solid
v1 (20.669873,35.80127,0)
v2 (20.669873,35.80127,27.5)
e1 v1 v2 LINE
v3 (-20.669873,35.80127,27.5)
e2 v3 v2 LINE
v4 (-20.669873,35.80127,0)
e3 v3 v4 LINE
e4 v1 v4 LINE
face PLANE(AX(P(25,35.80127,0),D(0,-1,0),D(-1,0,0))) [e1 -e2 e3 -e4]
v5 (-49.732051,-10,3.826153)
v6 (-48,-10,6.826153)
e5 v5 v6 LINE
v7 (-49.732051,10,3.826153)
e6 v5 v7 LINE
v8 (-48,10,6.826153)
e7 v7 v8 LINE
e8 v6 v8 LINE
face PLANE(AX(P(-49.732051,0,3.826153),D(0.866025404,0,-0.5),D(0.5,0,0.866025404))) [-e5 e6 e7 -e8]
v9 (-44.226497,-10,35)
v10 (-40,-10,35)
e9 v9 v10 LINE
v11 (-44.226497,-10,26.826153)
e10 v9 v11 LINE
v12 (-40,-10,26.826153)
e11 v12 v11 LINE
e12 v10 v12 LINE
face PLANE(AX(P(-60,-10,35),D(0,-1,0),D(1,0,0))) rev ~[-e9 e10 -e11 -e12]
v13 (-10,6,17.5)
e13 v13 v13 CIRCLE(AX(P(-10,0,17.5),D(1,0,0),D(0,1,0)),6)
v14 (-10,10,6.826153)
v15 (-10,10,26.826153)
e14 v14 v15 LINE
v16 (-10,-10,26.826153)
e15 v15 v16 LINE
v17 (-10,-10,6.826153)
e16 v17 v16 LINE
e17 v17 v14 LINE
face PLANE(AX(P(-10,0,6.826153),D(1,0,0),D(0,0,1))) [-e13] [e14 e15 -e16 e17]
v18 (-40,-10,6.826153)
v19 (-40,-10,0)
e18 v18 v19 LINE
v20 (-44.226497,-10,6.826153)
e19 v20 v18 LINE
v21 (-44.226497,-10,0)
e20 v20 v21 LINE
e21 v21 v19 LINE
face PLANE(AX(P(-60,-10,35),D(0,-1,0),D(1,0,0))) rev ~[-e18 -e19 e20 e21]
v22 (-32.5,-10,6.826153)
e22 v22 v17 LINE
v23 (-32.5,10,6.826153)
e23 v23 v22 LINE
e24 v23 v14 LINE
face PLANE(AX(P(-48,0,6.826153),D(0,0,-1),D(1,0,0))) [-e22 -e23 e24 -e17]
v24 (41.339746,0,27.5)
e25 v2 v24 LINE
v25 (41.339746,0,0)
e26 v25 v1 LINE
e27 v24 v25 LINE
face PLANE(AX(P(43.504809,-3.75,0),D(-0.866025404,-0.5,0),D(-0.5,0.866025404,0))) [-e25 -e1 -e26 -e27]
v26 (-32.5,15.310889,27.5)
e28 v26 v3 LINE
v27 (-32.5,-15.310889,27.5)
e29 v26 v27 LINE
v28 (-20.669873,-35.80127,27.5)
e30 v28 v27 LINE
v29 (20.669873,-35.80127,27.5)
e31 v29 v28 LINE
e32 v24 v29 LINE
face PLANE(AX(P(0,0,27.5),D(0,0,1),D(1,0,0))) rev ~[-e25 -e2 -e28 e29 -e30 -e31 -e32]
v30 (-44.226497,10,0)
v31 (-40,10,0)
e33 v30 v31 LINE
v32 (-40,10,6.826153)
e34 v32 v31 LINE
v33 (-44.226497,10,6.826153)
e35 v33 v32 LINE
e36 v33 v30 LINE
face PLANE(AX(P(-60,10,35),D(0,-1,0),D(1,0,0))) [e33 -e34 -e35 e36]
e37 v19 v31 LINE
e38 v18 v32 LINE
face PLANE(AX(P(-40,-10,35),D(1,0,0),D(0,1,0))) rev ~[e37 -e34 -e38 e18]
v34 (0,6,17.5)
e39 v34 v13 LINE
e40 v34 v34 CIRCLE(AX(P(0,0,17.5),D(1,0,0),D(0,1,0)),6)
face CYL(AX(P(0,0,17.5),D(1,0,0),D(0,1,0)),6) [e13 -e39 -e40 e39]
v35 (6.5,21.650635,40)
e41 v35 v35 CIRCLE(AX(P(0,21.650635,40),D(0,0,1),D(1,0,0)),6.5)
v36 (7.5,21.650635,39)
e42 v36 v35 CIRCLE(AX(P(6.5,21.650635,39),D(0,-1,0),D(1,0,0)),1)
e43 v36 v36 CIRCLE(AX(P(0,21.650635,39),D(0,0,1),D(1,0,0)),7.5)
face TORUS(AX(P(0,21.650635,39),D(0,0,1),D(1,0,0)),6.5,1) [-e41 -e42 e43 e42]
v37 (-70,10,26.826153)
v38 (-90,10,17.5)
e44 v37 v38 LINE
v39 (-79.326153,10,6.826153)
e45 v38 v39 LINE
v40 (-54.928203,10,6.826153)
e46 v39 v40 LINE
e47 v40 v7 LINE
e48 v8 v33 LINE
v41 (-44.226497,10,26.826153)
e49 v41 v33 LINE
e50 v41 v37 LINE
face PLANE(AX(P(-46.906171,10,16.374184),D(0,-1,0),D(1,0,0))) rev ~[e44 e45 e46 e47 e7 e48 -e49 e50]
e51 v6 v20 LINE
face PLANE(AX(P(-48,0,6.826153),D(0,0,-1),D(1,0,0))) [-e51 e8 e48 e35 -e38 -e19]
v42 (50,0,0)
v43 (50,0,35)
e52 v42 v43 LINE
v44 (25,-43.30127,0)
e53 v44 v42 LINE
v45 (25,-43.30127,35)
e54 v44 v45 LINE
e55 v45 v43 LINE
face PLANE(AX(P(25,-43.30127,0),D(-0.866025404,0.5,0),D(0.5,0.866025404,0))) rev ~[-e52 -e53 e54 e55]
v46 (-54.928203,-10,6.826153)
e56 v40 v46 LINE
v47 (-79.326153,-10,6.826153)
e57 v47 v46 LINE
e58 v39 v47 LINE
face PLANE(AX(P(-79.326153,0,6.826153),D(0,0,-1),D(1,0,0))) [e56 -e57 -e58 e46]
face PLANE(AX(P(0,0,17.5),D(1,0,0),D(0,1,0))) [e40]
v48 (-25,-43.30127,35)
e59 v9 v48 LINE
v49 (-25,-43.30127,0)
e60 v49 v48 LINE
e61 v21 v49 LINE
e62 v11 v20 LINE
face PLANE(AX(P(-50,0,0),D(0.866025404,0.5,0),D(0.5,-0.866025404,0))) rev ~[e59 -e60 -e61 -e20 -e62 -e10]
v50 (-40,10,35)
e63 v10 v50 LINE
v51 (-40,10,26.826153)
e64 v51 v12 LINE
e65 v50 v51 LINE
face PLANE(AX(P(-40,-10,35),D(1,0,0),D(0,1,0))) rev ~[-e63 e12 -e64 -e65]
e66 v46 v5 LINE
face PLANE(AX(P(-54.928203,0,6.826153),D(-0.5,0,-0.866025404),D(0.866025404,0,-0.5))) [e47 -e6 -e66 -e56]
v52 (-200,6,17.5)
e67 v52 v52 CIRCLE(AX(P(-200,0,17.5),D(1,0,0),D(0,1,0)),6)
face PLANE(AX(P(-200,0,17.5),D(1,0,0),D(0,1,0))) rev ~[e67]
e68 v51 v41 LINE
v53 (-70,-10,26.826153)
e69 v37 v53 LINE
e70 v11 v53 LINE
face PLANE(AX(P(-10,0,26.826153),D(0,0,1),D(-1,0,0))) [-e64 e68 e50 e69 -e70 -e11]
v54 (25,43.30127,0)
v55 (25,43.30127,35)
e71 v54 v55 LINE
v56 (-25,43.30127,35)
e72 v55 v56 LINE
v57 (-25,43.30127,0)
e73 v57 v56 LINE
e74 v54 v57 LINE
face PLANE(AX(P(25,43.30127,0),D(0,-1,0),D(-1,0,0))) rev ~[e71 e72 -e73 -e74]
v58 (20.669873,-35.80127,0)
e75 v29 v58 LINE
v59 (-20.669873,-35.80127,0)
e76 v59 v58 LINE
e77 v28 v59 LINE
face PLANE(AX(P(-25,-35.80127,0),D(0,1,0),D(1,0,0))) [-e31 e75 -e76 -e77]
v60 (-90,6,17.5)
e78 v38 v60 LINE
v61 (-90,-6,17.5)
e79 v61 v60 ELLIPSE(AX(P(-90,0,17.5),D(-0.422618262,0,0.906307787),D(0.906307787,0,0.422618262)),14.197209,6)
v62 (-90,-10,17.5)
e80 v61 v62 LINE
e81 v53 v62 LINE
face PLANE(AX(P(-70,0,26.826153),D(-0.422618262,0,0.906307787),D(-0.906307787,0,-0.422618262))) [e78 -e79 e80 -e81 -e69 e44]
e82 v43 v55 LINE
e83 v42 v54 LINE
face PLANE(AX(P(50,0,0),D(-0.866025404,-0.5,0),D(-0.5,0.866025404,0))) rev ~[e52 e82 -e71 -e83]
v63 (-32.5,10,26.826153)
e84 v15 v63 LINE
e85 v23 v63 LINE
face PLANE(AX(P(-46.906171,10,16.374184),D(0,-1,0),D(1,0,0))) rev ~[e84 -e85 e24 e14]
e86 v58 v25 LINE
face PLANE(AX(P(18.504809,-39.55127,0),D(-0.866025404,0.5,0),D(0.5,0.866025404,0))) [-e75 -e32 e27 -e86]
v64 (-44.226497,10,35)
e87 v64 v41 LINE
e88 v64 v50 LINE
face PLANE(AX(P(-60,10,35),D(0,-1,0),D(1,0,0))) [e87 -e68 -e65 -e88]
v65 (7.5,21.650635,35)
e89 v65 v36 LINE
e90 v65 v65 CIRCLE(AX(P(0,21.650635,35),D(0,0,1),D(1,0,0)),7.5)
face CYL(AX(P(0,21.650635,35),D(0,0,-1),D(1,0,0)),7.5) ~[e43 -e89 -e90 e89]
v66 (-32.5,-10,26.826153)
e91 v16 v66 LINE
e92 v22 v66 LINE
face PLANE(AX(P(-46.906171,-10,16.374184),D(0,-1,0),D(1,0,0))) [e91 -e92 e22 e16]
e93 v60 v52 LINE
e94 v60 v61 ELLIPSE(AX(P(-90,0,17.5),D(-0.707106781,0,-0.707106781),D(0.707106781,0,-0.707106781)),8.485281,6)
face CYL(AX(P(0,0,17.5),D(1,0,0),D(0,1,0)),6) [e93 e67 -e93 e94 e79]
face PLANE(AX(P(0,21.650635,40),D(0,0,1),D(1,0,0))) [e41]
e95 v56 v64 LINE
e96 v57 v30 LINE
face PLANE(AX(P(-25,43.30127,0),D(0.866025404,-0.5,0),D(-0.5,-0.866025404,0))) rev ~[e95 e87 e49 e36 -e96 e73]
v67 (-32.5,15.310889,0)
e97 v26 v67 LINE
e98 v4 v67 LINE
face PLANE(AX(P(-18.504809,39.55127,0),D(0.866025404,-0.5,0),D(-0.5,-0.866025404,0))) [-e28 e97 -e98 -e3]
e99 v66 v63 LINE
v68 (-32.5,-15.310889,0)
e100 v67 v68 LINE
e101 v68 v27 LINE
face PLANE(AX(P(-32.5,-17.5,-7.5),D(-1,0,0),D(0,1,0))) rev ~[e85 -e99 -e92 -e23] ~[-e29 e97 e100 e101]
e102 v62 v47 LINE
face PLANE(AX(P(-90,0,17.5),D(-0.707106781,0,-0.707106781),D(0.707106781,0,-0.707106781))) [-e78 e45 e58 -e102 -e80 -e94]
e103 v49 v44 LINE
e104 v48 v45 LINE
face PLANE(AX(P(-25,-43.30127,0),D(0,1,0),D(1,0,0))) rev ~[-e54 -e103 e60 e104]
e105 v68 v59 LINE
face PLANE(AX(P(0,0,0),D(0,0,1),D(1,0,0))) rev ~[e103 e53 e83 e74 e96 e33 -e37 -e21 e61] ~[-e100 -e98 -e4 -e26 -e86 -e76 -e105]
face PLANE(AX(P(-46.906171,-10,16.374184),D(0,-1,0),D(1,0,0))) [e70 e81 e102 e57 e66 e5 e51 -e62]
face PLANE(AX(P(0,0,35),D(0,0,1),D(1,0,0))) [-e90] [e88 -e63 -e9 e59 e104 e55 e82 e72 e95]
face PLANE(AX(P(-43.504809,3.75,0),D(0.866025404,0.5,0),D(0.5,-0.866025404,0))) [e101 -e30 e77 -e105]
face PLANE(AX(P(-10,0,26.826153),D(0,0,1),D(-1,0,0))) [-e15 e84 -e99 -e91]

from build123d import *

# Parameters (mm, degrees)
F1_DEPTH    = 35
F2_R        = 7.5
F3_DEPTH    = 5
F4_R        = 1
F5_W        = 20
F5_H        = 20
F6_DEPTH    = 35.001
F7_T        = 7.5
F7_T3_DEPTH = 50
F10_DEPTH   = 10
F9_R        = 6
F11_DEPTH   = 200


# Not quite as in the source:
# - a shell that OpenCascade refuses in one call is made with other operations: the cavity is built on its own and cut out


with BuildPart() as f1:
    # F0 (on Top) → F1 (new body)
    with BuildSketch(Plane.XY):
        Polygon((25, 43.3012701892), (-25, 43.3012701892), (-50, 0), (-25, -43.3012701892), (25, -43.3012701892), (50, 0), align=None)
    extrude(amount=F1_DEPTH)

    # F2 (on face) → F3 (join)
    with BuildSketch(Plane.XY.offset(35)):
        with Locations((0, 21.6506350946)):
            Circle(F2_R)
    extrude(amount=F3_DEPTH)

    # F4
    f4_edges = [f1.edges().sort_by_distance(p)[0] for p in [
        (-7.5, 21.650635, 40),
    ]]
    fillet(f4_edges, radius=F4_R)

    # F5 (on face) → F6 (cut, through all)
    with BuildSketch(Plane.XY.offset(35)):
        with Locations((-50, 0)):
            Rectangle(F5_W, F5_H)
    extrude(amount=-F6_DEPTH, mode=Mode.SUBTRACT)

    # F7: shell of thickness 7.5, made by hand


with BuildPart() as f7_core1:
    # F7_t2: copy of F1
    add(f1.part)

    # the walls: a layer under each face that stays
    f7_faces = [f7_core1.faces().sort_by_distance(p)[0] for p in [
        (2.8867513459, 0, 35),
        (0, 21.6506350946, 40),
        (37.5, 21.6506350946, 17.5),
        (37.5, -21.6506350946, 17.5),
        (0, -43.3012701892, 17.5),
        (-34.6132486541, -26.6506350946, 17.5),
        (-42.1132486541, -10, 17.5),
        (-40, 0, 17.5),
        (-42.1132486541, 10, 17.5),
        (-34.6132486541, 26.6506350946, 17.5),
        (0, 43.3012701892, 17.5),
    ]]
    thicken(f7_faces, amount=-F7_T, mode=Mode.SUBTRACT)

    # F7_s4 → F7_t3 (cut)
    with BuildSketch(Plane.XY.offset(-7.5)):
        Polygon((-40.075, -9.925), (-40, -17.5), (-32.5, -17.5), (-32.5, -10), align=None)
        Polygon((-40.075, 9.925), (-32.5, 10), (-32.5, 17.5), (-40, 17.5), align=None)
    extrude(amount=F7_T3_DEPTH, mode=Mode.SUBTRACT)

    # F7_s5 → F7_t6 (revolve, cut)
    with BuildSketch(Plane.XZ.offset(-21.6506350946)):
        Polygon((7.575, 35.075), (0, 35), (0, 27.5), (7.5, 27.5), align=None)
    revolve(axis=Axis((0, 21.6506350946, 35), (0, 0, 1)), mode=Mode.SUBTRACT)


with BuildPart() as f1_1:
    add(f1.part)

    # what is left inside the walls is the cavity
    f7_cavity = [f7_core1.part.solids().sort_by_distance(p)[0] for p in [
        (4.419873, -11.933757, 27.425),
    ]]
    add(f7_cavity, mode=Mode.SUBTRACT)

    # F8 (on Front) → F10 (join, symmetric)
    with BuildSketch(Plane.XZ):
        Polygon((-10, 6.8261531631), (-10, 26.8261531631), (-70, 26.8261531631), (-90, 17.5), (-79.3261531631, 6.8261531631), (-54.9282032303, 6.8261531631), (-49.7320508076, 3.8261531631), (-48, 6.8261531631), align=None)
    extrude(amount=F10_DEPTH, both=True)

    # F9 (on Right) → F11 (join)
    with BuildSketch(Plane.YZ):
        with Locations((0, 17.5)):
            Circle(F9_R)
    extrude(amount=-F11_DEPTH)


solid = f1_1.part
